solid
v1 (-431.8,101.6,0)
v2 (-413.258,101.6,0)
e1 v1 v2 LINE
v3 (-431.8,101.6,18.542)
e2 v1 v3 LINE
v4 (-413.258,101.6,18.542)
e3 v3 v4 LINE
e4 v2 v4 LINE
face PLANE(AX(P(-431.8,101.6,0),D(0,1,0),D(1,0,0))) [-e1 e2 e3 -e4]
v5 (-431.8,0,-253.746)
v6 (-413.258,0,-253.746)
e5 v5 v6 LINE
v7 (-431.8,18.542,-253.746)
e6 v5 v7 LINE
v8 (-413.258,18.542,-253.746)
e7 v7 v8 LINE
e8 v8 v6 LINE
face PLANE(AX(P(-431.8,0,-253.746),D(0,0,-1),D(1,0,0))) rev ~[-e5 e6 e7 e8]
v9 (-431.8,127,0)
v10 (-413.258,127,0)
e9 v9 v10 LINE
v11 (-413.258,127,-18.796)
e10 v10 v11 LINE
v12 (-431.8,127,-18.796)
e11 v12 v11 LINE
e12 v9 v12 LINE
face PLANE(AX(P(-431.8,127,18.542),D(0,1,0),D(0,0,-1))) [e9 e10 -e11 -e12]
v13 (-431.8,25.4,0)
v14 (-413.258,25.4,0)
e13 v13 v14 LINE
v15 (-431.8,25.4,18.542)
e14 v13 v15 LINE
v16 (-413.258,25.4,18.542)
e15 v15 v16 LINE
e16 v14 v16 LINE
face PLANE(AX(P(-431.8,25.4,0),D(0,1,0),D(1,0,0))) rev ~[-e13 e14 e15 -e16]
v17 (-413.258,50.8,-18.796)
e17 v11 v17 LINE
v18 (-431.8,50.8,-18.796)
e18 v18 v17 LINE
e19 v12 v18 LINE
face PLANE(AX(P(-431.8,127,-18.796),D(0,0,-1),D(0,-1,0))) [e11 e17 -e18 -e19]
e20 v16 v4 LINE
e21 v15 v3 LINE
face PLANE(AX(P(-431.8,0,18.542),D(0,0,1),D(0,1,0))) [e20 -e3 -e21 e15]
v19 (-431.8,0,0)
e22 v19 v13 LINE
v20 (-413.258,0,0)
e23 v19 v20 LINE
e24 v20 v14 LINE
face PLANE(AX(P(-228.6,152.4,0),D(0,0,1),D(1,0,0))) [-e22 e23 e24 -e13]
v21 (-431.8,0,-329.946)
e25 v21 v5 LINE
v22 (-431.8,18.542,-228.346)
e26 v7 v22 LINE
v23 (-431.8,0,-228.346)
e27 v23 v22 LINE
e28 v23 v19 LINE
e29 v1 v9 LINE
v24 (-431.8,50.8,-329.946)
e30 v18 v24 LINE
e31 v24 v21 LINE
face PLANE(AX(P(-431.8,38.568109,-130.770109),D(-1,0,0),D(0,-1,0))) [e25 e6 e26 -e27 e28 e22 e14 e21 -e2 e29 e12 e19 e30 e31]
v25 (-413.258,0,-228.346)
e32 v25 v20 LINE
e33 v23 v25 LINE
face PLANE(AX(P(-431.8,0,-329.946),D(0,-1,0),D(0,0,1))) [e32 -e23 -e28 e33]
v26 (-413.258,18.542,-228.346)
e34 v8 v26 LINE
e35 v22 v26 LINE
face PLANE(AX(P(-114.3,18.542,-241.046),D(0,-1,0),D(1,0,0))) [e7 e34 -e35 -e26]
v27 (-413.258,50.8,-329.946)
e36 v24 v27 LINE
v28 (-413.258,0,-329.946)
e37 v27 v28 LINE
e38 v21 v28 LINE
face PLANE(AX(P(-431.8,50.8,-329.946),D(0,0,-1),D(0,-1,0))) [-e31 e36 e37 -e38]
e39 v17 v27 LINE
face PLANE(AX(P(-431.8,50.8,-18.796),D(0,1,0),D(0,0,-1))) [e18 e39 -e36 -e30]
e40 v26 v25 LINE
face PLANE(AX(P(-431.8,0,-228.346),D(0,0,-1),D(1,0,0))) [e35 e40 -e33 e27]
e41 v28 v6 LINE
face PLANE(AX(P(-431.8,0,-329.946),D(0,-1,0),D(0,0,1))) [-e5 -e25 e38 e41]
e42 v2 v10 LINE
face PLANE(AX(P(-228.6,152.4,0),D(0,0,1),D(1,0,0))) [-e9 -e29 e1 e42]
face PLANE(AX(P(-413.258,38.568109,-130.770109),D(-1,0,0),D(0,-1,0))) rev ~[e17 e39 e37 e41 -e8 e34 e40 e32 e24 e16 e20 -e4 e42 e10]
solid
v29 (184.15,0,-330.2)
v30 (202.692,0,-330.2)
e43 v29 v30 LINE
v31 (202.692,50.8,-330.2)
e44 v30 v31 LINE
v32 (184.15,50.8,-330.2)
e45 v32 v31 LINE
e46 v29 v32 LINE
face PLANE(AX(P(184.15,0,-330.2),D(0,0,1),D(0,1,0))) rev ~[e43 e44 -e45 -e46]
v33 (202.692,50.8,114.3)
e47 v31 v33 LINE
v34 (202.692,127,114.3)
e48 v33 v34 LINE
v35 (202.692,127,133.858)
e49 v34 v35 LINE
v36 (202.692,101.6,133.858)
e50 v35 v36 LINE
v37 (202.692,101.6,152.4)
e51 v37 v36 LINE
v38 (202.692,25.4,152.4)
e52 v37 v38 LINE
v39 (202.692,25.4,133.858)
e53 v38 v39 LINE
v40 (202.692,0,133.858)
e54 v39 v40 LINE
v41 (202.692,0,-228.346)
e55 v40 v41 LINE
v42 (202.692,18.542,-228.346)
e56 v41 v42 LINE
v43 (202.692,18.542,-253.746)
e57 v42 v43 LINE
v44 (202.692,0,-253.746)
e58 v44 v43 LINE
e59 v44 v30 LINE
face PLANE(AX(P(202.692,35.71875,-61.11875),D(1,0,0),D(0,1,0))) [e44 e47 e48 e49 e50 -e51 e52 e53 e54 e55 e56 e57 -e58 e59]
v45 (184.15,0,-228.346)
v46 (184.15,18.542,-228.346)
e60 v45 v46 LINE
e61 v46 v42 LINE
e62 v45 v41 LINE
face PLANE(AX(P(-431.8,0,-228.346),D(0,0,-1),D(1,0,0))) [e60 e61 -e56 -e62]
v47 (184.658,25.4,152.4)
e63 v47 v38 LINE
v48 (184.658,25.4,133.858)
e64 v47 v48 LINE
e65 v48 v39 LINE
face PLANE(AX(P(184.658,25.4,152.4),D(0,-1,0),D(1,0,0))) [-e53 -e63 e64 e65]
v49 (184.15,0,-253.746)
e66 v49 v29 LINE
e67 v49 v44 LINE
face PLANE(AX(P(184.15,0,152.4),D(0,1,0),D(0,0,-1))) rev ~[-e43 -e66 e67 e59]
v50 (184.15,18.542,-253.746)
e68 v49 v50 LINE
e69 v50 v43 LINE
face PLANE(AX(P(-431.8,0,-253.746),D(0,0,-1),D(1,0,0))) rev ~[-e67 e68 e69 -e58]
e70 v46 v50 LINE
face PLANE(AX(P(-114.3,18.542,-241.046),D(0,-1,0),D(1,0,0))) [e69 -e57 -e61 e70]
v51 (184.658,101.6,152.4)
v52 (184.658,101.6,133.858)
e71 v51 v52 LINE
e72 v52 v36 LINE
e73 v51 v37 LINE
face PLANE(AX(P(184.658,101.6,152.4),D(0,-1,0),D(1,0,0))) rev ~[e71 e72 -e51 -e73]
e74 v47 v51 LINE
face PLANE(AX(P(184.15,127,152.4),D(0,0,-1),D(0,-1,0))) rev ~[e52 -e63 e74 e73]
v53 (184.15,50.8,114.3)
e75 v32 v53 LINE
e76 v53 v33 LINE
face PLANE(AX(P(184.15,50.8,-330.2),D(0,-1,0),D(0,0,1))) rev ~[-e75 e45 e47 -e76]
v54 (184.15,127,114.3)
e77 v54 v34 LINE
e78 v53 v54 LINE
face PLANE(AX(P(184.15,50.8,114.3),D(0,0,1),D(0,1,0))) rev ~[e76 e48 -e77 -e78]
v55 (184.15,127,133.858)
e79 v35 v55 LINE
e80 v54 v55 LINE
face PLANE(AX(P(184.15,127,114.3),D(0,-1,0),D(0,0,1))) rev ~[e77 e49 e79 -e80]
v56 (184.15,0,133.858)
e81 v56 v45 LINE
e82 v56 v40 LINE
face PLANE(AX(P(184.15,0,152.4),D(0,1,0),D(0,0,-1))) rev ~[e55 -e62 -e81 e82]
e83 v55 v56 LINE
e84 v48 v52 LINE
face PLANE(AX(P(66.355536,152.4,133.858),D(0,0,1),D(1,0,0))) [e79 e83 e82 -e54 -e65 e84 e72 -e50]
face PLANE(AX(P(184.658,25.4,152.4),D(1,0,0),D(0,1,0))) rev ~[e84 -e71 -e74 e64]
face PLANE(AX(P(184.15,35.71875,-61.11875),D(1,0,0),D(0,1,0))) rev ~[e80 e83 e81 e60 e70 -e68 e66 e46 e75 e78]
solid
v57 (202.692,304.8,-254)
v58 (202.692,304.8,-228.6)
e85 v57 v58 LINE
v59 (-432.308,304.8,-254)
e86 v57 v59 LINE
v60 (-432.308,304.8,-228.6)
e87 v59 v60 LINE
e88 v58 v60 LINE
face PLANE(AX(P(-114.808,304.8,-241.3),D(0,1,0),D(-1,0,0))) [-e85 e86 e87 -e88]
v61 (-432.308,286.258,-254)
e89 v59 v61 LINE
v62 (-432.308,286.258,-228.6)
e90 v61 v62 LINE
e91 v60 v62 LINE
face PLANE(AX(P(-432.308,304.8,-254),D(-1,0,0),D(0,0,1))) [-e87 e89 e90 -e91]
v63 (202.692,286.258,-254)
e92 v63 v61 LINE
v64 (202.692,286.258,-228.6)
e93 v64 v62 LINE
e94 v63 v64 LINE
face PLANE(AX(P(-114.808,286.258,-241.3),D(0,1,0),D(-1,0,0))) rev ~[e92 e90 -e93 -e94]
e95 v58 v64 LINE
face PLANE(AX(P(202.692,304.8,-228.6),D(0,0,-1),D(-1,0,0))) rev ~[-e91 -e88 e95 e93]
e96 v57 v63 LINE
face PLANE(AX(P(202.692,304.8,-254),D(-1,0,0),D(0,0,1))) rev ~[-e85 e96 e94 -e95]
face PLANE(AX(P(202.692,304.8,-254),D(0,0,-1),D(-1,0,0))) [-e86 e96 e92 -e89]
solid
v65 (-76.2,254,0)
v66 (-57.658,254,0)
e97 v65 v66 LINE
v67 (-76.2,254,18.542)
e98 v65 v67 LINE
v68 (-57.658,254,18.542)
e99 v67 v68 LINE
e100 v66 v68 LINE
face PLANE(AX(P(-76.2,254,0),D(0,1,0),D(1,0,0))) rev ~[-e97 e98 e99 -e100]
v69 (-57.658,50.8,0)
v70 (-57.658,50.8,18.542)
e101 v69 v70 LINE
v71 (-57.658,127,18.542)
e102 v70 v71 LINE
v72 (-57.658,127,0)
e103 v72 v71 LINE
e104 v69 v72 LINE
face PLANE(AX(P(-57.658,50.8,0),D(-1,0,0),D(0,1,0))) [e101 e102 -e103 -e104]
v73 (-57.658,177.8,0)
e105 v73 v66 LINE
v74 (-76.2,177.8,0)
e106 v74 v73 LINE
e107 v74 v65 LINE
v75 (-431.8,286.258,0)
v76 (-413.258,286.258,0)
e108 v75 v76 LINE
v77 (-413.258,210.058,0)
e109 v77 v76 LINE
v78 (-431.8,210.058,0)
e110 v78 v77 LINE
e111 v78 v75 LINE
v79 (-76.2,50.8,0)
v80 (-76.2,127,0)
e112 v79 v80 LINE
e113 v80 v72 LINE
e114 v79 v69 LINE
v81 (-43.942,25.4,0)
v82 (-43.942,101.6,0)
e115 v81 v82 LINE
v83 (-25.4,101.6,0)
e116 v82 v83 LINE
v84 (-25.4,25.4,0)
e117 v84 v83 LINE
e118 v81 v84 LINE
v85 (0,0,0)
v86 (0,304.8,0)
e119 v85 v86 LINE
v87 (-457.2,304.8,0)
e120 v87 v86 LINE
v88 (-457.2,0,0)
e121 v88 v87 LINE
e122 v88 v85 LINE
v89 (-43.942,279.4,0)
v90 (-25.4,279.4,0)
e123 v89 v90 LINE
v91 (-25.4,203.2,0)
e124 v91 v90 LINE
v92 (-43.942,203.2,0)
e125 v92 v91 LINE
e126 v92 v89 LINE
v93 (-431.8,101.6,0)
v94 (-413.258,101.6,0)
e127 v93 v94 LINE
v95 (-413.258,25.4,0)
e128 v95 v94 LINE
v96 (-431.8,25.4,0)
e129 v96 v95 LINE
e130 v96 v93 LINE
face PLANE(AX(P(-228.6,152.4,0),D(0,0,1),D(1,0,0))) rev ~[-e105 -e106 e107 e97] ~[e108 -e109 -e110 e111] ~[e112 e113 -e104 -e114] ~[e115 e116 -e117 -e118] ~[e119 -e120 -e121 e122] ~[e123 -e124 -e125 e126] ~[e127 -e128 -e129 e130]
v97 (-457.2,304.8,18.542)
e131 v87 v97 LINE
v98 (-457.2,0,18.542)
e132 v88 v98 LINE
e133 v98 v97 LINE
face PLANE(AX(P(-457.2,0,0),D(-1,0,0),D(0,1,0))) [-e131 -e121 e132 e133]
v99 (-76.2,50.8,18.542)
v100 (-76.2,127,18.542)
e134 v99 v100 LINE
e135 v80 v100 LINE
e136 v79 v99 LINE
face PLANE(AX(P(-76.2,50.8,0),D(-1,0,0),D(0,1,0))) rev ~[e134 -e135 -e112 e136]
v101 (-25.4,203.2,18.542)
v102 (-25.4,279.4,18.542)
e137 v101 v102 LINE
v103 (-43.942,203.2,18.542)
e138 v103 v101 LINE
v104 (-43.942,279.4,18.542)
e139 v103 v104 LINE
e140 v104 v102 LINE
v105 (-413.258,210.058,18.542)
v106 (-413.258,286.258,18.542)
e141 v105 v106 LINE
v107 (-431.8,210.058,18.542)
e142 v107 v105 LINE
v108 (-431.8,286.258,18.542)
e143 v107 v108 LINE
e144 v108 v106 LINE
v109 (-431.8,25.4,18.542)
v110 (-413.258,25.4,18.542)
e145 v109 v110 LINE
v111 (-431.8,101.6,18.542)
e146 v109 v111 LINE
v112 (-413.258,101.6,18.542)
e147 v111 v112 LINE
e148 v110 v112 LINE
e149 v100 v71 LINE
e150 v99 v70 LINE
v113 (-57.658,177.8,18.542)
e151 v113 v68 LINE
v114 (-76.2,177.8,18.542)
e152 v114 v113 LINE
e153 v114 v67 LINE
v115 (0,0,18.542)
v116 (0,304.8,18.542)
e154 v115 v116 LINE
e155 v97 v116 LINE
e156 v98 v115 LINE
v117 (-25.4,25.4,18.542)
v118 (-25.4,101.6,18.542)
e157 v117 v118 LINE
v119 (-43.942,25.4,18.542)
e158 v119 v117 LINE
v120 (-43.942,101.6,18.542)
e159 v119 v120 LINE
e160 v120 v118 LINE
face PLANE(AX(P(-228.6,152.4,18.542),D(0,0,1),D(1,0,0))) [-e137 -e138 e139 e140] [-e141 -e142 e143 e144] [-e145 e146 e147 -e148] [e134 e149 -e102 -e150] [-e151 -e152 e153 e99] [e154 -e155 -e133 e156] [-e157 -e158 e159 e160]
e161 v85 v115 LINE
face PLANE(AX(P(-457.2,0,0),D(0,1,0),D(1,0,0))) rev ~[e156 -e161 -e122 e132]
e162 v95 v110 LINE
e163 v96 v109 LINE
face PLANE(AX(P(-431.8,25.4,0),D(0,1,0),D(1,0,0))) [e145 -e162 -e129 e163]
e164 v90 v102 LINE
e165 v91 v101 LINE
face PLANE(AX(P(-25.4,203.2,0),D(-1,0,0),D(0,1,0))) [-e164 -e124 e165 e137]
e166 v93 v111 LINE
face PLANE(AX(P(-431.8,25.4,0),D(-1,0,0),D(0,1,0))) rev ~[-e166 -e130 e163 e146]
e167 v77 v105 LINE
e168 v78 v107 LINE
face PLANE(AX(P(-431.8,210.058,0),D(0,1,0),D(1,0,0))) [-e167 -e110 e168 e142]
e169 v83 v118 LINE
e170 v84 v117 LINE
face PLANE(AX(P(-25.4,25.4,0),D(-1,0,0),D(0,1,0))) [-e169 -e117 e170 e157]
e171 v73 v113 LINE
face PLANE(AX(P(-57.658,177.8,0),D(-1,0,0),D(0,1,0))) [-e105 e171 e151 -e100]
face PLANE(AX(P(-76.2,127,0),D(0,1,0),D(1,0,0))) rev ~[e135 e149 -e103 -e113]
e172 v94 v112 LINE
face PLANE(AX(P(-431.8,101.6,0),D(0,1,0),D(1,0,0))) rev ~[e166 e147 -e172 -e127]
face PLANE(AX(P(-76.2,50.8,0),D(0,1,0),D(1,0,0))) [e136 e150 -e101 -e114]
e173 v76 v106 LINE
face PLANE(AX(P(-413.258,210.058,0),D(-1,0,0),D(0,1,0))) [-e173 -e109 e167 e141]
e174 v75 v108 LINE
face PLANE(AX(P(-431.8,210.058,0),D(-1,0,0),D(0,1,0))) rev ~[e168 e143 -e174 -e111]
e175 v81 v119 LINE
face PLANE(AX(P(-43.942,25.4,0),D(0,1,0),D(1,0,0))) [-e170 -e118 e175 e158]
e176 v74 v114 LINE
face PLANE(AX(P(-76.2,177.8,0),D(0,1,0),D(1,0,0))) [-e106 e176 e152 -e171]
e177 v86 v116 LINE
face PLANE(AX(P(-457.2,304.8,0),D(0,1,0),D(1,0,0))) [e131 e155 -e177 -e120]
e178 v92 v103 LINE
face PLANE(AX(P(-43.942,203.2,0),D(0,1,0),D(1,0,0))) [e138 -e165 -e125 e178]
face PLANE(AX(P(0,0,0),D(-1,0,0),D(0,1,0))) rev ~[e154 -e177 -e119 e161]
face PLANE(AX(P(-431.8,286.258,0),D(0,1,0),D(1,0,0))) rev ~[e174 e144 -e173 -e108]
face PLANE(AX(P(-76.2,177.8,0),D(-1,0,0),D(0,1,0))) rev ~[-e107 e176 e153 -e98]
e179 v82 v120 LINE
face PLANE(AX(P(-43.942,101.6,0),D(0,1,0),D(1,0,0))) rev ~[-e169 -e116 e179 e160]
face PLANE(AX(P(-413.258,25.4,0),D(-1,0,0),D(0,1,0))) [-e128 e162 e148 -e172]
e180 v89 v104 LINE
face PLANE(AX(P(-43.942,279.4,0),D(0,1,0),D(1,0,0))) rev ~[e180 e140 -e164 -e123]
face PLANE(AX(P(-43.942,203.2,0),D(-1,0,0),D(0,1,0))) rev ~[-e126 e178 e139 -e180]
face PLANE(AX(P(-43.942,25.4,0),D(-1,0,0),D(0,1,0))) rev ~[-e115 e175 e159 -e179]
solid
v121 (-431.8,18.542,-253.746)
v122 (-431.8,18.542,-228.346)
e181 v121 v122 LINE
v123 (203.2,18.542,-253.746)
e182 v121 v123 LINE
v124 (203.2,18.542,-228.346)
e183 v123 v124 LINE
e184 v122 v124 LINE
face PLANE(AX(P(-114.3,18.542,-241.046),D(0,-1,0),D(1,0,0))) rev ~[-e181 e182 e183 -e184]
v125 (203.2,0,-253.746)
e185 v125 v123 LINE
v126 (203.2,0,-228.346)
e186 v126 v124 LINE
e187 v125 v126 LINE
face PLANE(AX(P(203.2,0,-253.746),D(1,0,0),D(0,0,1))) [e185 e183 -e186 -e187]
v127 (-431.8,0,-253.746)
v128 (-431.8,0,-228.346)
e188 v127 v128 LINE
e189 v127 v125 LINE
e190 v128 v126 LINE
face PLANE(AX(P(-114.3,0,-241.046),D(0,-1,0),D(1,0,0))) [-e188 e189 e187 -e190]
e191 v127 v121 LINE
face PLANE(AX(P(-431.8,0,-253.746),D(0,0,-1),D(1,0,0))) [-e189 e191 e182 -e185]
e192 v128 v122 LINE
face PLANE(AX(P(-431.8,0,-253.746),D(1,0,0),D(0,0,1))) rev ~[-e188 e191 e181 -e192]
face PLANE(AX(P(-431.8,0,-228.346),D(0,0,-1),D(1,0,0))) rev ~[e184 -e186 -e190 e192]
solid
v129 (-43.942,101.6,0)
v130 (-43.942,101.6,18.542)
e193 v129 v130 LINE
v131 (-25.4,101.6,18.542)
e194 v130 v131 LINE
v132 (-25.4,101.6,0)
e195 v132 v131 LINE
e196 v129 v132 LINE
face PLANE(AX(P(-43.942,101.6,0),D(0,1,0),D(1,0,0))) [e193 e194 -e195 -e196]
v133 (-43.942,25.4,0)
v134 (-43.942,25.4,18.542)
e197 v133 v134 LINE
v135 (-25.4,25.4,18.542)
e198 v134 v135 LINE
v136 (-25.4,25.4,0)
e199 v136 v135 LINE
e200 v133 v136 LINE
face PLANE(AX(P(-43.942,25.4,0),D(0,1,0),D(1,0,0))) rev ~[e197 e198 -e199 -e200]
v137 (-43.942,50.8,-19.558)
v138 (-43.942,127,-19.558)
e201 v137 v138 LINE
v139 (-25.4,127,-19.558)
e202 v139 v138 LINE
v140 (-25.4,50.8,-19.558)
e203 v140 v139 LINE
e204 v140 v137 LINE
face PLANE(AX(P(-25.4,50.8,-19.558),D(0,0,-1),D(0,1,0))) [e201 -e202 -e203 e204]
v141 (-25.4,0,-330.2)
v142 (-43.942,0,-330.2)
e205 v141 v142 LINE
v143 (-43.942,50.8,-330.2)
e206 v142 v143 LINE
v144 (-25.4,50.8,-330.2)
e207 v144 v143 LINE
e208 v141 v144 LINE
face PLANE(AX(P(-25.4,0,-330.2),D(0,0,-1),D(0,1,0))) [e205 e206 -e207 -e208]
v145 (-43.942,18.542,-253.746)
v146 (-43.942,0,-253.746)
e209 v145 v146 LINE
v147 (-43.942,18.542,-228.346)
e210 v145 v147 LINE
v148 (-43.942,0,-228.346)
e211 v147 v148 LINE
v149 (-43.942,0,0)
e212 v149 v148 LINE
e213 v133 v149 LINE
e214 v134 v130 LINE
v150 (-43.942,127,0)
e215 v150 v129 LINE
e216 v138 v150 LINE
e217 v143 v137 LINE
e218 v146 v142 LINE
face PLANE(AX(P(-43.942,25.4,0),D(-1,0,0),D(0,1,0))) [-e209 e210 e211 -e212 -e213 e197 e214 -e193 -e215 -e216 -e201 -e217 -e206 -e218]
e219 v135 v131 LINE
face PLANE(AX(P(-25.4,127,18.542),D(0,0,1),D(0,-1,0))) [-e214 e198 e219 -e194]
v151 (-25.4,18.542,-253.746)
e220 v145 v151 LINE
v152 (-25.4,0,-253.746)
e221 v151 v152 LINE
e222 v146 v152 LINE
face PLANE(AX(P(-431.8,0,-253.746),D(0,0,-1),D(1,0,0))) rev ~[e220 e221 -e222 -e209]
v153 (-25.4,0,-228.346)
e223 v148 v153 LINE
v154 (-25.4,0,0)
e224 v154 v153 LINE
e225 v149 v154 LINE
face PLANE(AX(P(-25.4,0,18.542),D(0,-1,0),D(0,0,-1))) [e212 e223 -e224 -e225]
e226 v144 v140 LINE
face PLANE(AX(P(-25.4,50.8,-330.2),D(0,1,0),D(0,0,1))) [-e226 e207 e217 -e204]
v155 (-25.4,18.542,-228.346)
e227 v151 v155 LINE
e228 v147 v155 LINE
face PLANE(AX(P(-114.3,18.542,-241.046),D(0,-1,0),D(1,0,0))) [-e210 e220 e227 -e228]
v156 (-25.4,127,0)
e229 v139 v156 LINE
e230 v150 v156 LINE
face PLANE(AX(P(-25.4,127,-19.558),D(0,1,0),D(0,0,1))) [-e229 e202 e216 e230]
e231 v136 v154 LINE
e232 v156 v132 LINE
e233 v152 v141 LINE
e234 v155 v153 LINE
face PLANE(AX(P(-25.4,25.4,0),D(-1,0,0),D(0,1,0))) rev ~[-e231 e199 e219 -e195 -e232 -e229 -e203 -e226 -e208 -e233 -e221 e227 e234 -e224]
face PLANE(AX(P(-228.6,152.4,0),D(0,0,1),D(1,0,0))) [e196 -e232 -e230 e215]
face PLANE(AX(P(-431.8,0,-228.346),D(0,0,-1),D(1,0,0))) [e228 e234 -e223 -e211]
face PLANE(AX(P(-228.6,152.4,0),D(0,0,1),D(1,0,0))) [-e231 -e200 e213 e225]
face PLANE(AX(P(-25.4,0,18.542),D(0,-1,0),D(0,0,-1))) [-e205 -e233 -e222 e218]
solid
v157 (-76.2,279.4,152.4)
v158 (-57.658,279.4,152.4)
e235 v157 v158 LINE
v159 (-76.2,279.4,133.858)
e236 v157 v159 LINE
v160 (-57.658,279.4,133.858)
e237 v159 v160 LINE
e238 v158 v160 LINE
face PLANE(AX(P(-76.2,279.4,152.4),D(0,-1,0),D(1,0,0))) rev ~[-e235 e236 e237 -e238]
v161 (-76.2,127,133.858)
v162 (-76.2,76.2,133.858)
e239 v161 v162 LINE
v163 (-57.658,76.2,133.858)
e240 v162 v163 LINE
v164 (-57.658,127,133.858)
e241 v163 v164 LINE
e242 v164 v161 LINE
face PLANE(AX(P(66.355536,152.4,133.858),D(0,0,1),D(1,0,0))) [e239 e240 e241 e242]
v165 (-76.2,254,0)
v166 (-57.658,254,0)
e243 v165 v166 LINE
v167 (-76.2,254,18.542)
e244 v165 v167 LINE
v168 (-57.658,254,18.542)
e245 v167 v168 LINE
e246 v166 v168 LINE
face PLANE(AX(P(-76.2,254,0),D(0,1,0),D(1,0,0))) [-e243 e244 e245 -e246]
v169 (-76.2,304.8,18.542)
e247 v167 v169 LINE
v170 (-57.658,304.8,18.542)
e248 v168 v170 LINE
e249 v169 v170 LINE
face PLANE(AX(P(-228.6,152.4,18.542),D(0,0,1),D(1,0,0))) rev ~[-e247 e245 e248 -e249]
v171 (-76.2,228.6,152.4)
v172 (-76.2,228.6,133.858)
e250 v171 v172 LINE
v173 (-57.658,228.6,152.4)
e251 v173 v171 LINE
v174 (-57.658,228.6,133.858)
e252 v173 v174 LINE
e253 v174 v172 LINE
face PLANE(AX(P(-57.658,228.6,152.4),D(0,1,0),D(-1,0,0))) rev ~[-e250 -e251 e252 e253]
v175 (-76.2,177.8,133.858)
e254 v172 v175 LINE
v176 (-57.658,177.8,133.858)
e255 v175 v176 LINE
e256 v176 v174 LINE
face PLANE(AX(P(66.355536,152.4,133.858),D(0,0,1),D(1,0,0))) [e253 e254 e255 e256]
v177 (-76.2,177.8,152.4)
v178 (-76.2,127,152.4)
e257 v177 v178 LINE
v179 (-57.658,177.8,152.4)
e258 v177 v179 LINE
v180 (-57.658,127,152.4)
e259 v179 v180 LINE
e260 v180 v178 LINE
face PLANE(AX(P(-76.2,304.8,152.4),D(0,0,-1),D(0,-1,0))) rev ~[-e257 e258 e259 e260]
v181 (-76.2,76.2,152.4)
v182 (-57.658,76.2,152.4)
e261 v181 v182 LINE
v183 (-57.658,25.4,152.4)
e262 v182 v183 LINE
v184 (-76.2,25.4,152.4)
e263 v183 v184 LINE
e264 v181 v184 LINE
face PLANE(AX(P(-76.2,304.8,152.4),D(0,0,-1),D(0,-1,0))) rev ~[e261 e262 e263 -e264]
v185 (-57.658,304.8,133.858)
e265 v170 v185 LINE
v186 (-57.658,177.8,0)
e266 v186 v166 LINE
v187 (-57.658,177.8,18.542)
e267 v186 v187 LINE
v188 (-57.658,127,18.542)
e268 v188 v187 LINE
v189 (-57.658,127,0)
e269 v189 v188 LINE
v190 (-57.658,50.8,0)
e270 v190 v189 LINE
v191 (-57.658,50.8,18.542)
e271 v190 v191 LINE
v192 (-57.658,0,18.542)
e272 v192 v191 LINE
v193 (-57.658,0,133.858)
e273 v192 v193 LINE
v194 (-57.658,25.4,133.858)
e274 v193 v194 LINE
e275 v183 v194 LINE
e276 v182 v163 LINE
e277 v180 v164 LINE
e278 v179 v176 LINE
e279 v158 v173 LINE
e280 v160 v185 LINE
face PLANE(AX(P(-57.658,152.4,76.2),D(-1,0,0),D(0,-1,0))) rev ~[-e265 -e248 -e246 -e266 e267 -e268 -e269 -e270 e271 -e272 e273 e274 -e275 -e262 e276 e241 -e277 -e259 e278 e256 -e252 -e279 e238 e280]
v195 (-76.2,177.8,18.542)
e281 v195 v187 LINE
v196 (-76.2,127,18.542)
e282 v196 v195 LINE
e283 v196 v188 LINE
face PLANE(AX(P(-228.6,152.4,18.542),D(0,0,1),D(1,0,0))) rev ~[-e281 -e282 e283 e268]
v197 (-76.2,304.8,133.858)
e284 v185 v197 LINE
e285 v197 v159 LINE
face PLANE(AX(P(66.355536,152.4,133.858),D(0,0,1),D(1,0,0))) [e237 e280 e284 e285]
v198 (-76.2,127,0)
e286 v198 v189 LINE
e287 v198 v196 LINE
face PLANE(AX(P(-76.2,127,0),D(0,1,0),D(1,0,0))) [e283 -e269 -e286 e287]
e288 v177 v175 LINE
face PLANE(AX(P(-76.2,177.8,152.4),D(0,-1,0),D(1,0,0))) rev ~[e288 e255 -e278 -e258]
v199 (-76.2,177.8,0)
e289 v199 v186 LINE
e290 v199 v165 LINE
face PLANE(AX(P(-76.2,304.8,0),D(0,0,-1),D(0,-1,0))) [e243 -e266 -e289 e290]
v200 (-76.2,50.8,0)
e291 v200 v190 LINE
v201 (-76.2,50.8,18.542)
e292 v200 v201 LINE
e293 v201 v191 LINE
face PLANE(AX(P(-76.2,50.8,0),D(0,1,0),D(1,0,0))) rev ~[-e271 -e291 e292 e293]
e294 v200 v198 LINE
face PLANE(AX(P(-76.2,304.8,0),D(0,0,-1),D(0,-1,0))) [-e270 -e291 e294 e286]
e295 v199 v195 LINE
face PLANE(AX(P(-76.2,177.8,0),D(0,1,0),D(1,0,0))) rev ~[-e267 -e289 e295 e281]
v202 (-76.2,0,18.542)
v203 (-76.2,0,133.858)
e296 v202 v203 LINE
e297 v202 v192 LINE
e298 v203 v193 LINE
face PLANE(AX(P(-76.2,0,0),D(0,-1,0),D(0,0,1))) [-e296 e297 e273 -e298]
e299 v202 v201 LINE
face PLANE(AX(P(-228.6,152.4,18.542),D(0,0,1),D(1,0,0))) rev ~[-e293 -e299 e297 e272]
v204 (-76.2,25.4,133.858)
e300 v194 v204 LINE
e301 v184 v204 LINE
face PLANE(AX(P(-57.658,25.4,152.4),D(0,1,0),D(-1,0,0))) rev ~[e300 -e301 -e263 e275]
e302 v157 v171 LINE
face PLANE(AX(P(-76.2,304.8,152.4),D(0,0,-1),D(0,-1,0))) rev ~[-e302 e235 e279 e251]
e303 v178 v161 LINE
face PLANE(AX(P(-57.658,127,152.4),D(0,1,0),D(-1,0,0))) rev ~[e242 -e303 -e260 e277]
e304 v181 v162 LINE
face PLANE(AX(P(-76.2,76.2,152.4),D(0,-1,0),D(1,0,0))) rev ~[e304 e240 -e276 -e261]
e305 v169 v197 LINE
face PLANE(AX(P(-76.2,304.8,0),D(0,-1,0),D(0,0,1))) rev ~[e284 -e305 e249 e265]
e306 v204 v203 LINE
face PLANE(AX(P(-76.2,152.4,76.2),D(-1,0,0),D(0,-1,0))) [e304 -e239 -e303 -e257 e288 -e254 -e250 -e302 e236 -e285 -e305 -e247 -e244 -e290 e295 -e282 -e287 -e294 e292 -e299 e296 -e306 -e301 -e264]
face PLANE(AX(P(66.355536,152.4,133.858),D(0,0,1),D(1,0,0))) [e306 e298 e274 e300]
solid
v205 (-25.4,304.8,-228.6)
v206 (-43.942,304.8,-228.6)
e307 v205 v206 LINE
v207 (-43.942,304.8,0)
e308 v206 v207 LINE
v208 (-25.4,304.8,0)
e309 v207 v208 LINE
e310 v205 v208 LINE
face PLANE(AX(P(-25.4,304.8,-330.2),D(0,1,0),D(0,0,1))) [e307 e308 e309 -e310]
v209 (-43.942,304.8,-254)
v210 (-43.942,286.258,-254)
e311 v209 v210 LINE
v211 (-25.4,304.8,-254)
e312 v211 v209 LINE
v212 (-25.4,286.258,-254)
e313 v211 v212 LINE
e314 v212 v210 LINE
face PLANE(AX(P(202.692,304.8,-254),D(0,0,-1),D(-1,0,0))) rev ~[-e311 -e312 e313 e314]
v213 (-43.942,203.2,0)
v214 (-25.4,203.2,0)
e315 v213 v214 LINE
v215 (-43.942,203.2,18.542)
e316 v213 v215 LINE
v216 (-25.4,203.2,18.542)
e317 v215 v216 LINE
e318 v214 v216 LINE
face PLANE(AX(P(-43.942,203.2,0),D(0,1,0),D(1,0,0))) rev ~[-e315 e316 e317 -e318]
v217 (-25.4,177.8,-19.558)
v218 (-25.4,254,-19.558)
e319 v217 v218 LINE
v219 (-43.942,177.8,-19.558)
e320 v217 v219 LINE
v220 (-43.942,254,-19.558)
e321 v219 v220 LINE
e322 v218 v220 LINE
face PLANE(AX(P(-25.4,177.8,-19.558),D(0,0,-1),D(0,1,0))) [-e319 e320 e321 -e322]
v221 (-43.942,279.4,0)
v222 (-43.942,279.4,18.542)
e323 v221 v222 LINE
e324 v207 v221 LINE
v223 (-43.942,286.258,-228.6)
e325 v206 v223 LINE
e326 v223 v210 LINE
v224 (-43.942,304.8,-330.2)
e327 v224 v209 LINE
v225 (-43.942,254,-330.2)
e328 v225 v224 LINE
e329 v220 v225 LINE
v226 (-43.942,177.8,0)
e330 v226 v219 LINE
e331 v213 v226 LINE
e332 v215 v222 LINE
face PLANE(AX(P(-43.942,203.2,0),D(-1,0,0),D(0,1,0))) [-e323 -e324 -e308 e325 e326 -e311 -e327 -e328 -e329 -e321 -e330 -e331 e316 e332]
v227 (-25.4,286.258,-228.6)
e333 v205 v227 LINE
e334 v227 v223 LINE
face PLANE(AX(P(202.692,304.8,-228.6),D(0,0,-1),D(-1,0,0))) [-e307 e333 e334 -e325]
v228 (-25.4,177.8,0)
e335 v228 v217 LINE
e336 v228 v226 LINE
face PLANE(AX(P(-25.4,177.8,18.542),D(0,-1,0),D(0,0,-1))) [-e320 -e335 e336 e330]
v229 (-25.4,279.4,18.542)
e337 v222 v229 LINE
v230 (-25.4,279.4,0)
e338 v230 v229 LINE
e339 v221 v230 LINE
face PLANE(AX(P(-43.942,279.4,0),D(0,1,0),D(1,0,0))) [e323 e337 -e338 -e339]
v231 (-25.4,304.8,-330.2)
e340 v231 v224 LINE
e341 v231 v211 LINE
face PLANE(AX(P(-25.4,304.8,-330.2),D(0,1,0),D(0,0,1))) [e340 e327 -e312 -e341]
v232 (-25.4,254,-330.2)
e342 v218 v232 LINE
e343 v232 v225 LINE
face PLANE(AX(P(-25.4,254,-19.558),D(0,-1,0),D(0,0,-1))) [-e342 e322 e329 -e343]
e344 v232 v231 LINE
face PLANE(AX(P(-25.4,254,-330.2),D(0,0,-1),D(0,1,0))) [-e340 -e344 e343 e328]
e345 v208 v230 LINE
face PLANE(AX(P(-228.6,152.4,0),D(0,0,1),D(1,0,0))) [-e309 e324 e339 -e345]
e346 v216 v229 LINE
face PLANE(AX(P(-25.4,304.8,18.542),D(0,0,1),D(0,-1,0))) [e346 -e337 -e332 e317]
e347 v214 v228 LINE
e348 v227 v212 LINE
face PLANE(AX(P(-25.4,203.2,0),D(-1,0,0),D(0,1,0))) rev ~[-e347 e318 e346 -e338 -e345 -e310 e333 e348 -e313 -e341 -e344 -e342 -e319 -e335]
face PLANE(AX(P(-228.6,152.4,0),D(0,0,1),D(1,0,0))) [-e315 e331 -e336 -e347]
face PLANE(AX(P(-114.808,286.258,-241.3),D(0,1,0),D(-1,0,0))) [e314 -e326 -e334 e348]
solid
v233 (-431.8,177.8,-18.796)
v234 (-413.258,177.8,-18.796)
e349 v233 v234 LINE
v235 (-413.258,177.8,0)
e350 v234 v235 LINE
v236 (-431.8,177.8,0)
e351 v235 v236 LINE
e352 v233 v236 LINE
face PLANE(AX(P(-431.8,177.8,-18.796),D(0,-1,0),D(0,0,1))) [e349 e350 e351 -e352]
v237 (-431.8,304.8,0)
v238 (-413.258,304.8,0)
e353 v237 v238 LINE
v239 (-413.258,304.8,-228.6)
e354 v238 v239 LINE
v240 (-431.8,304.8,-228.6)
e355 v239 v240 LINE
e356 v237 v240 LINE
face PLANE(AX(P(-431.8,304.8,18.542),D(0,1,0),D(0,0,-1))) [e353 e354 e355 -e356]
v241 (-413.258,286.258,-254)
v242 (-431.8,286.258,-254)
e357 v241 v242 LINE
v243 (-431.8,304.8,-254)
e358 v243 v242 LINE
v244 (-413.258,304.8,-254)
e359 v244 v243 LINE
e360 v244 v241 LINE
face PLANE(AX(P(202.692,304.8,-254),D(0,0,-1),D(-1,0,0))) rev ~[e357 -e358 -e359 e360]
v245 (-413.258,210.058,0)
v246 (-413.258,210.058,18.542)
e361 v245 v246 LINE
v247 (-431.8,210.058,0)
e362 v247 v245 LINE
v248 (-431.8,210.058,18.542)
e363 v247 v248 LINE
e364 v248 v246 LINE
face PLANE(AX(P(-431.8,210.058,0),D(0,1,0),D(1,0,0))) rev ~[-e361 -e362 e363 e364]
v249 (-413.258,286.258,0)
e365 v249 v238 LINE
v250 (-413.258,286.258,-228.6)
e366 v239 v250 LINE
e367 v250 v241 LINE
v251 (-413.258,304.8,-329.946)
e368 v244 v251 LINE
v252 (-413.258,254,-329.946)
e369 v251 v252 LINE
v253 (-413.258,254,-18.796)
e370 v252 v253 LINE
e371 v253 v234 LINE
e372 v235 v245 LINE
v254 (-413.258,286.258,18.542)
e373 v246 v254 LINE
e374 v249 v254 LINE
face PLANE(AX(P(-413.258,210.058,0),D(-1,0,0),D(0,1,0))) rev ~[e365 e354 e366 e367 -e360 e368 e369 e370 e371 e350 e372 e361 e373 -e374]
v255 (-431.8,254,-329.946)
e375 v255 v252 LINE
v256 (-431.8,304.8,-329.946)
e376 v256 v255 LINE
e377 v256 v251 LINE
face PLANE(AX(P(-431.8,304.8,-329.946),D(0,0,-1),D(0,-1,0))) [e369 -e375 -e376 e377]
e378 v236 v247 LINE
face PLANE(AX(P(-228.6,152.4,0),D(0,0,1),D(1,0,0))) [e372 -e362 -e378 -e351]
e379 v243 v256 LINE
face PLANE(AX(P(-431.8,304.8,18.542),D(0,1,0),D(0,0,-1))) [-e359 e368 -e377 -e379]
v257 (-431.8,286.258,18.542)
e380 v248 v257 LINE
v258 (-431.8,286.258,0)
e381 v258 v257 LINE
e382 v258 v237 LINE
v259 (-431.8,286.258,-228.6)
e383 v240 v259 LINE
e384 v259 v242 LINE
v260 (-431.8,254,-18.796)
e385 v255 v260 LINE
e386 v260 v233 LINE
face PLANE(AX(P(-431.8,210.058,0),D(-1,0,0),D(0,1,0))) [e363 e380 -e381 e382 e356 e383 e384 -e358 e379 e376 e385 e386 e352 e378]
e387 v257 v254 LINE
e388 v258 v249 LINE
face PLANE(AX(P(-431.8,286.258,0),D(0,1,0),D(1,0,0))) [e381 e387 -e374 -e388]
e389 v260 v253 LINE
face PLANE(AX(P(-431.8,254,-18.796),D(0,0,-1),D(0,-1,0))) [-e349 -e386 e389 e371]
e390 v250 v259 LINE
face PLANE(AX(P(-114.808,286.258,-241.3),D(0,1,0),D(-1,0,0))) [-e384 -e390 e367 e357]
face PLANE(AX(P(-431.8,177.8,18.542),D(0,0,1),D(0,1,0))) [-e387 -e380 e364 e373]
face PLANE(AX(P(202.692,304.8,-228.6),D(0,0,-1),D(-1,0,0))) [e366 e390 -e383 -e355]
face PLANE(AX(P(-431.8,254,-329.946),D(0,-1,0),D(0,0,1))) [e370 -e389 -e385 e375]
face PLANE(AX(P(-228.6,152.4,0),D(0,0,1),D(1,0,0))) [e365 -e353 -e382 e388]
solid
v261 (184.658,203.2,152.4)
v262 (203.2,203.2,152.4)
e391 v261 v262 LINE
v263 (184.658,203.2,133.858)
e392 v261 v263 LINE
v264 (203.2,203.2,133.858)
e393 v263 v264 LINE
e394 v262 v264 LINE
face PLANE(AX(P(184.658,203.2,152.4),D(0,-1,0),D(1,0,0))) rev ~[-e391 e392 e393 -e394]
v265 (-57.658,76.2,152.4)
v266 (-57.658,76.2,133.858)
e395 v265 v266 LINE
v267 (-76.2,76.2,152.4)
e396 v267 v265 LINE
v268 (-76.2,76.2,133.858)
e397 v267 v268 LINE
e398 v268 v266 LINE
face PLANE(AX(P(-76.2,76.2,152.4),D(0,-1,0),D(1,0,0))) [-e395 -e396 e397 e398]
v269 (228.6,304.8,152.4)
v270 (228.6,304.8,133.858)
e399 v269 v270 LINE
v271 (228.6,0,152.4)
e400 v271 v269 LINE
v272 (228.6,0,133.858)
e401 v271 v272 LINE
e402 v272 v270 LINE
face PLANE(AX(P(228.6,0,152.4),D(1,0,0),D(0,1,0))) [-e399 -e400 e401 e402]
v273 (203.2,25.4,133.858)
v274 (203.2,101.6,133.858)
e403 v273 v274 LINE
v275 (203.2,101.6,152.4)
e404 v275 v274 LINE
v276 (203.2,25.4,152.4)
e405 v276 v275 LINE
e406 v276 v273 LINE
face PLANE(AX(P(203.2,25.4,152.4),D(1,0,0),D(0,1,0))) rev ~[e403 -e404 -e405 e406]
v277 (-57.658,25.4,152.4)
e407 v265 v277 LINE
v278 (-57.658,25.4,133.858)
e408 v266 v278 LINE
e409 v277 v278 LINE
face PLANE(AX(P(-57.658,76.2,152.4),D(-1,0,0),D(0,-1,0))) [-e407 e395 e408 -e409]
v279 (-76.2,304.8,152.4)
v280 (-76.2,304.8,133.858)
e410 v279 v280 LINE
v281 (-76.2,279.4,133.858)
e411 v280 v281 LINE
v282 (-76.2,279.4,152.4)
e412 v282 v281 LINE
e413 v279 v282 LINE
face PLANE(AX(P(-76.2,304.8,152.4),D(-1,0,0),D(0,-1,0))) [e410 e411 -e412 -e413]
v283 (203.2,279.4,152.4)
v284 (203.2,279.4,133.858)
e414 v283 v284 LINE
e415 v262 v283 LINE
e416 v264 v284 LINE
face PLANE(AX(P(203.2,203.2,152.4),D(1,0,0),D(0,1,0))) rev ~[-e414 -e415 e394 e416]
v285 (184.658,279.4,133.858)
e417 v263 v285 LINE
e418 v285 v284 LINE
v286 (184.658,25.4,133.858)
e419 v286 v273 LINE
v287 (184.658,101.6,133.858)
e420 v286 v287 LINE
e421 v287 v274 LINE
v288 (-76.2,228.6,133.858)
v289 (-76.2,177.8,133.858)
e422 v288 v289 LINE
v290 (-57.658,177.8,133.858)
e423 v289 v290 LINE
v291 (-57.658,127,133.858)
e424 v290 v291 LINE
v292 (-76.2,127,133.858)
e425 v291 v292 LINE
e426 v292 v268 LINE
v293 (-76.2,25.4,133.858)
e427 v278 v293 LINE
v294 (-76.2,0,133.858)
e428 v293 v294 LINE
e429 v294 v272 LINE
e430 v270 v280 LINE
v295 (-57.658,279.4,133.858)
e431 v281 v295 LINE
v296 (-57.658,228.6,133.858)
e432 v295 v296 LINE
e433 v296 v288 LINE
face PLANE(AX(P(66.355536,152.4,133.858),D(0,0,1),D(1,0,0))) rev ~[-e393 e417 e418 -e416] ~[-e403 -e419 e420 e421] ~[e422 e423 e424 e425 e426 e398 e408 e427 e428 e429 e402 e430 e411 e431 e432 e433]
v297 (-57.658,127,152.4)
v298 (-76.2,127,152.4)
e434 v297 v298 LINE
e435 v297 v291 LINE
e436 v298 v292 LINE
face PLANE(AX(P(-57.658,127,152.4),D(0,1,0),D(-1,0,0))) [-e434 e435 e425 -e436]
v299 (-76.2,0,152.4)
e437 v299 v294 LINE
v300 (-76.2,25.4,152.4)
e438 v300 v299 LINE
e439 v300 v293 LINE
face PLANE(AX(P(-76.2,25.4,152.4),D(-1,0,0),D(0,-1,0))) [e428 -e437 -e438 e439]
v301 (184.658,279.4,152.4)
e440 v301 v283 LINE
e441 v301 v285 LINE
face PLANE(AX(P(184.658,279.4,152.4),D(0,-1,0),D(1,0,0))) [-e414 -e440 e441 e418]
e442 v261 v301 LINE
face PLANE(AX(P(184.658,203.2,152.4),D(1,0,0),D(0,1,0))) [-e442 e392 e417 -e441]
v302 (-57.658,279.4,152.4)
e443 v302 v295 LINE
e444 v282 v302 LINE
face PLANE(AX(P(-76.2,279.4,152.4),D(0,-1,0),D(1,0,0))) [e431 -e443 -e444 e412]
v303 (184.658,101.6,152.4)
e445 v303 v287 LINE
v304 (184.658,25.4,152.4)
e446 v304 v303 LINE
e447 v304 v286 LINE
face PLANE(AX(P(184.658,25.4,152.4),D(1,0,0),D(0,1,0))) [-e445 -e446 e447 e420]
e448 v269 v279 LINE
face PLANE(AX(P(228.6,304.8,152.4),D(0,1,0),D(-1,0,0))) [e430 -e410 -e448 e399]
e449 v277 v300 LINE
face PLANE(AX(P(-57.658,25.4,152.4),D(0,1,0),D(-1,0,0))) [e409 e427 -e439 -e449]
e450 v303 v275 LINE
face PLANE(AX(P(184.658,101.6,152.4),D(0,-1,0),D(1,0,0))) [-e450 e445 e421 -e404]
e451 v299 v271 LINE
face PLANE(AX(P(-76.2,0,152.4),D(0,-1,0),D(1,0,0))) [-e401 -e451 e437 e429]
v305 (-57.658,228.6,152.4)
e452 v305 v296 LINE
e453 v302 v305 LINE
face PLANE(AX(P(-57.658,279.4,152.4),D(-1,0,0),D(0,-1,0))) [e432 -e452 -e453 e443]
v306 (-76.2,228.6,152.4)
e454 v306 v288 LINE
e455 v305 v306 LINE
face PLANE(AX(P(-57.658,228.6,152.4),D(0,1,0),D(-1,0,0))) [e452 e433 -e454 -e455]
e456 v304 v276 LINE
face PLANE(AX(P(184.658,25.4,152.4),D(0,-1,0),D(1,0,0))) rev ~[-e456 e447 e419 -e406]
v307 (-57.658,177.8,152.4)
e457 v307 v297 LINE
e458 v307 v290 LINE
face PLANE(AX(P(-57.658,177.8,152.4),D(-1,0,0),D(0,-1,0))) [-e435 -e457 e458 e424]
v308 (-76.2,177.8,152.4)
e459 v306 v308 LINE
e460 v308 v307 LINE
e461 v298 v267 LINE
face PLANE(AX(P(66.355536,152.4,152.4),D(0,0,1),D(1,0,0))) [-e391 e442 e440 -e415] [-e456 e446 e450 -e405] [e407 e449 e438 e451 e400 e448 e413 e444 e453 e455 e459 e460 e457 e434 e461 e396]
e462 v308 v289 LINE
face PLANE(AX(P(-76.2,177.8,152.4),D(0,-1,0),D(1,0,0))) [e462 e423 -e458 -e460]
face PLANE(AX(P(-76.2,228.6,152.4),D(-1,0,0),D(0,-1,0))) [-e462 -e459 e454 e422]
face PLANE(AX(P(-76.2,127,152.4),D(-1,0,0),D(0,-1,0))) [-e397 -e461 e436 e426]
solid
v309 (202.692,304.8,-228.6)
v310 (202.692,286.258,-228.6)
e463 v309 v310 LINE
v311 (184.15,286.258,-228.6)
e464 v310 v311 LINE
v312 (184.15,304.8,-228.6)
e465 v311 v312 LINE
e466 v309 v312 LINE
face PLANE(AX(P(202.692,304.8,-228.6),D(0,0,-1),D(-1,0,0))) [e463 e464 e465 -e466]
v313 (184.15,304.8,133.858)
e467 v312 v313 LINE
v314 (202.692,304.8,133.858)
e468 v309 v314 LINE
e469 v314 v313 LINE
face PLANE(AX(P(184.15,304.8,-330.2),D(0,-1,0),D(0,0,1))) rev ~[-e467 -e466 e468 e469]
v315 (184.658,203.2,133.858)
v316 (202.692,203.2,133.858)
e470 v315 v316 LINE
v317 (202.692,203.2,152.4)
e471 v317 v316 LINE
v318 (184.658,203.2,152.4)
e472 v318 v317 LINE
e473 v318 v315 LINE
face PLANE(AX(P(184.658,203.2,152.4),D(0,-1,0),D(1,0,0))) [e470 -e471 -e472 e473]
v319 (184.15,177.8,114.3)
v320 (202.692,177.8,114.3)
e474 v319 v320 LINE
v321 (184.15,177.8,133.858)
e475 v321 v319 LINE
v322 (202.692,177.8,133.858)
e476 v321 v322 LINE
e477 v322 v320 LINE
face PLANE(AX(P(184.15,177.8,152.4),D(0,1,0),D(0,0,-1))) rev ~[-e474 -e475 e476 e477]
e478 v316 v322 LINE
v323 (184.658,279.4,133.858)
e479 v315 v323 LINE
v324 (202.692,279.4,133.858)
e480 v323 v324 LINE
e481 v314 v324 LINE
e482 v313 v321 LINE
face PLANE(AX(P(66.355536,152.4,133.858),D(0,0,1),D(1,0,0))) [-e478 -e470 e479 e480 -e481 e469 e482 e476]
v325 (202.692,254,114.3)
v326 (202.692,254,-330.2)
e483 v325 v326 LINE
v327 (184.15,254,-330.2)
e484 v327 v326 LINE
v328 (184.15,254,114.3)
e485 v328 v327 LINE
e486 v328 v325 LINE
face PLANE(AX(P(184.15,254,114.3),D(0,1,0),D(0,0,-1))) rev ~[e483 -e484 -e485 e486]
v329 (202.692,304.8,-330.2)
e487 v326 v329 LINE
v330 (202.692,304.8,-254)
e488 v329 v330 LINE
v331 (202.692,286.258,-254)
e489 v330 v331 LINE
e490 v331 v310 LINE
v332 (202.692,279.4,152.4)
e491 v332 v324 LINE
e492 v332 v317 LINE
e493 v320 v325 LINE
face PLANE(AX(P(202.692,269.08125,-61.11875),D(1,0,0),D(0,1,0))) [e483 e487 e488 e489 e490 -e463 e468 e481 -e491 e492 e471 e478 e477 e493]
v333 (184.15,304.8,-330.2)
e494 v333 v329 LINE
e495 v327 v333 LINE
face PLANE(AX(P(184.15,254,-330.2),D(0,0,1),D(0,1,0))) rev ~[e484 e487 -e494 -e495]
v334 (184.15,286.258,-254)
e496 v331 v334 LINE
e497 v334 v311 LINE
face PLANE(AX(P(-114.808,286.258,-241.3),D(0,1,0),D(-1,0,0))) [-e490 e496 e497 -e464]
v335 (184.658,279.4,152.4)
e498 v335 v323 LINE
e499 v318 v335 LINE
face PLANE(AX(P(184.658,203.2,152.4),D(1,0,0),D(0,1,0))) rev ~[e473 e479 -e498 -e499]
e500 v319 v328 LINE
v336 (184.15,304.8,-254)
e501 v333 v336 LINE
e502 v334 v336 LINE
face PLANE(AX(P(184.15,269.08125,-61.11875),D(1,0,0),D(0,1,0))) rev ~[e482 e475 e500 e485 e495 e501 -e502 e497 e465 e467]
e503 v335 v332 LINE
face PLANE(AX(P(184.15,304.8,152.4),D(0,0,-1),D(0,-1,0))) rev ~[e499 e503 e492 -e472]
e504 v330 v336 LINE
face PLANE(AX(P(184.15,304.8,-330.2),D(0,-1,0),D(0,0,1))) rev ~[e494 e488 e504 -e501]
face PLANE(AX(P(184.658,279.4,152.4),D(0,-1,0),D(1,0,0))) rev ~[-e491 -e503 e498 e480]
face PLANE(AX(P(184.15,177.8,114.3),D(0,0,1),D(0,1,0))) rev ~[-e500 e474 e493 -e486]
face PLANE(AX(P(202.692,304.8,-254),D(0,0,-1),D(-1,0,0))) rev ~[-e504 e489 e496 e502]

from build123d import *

# Parameters (mm, degrees)
F1_W      = 457.2
F1_H      = 304.8
F1_W_2    = 18.542
F1_H_2    = 76.2
F2_DEPTH  = 18.542
F4_W      = 18.542
F4_H      = 76.2
F5_DEPTH  = 18.542
F6_W      = 304.8
F6_H      = 152.4
F7_DEPTH  = 18.542
F11_DEPTH = 18.542
F18_DEPTH = 18.542
F24_DEPTH = 18.542
F27_W     = 635
F27_H     = 25.4
F28_DEPTH = 18.542
F29_W     = 635
F29_H     = 25.4
F30_DEPTH = 18.542


# Not quite as in the source:
# - a variable given as a bare number and used for a length is read in inches; the dataset says mm whatever the document's units were
# - a feature names something its author has since deleted; it is built from what else it names


with BuildPart() as f2:
    # F1 (on Top) → F2 (new body)
    with BuildSketch(Plane.XY):
        with Locations((-228.6, 152.4)):
            Rectangle(F1_W, F1_H)
        with Locations((-422.529, 63.5)):
            Rectangle(F1_W_2, F1_H_2, mode=Mode.SUBTRACT)
        with Locations((-34.671, 63.5)):
            Rectangle(F1_W_2, F1_H_2, mode=Mode.SUBTRACT)
        with Locations((-66.929, 88.9)):
            Rectangle(F1_W_2, F1_H_2, mode=Mode.SUBTRACT)
        with Locations((-422.529, 248.158)):
            Rectangle(F1_W_2, F1_H_2, mode=Mode.SUBTRACT)
        with Locations((-66.929, 215.9)):
            Rectangle(F1_W_2, F1_H_2, mode=Mode.SUBTRACT)
        with Locations((-34.671, 241.3)):
            Rectangle(F1_W_2, F1_H_2, mode=Mode.SUBTRACT)
    extrude(amount=F2_DEPTH)


with BuildPart() as f5:
    # F4 (on offset) → F5 (new body)
    with BuildSketch(Plane.XY.offset(152.4)):
        Polygon((-76.2, 25.4), (-76.2, 0), (228.6, 0), (228.6, 304.8), (-76.2, 304.8), (-76.2, 279.4), (-57.658, 279.4), (-57.658, 228.6), (-76.2, 228.6), (-76.2, 177.8), (-57.658, 177.8), (-57.658, 127), (-76.2, 127), (-76.2, 76.2), (-57.658, 76.2), (-57.658, 25.4), align=None)
        with Locations((193.929, 63.5)):
            Rectangle(F4_W, F4_H, mode=Mode.SUBTRACT)
        with Locations((193.929, 241.3)):
            Rectangle(F4_W, F4_H, mode=Mode.SUBTRACT)
    extrude(amount=-F5_DEPTH)


with BuildPart() as f7:
    # F6 (on face) → F7 (new body)
    with BuildSketch(Plane(origin=(-76.2, 0, 0), x_dir=(0, -1, 0), z_dir=(-1, 0, 0))):
        with Locations((-152.4, 76.2)):
            Rectangle(F6_W, F6_H)
    extrude(amount=-F7_DEPTH)

    # F8: cut F5
    add(f5.part, mode=Mode.SUBTRACT)

    # F16: cut F2
    add(f2.part, mode=Mode.SUBTRACT)


with BuildPart() as f11:
    # F10 (on Right) → F11 (new body)
    with BuildSketch(Plane.YZ):
        Polygon((127, 152.4), (0, 152.4), (0, -330.2), (50.8, -330.2), (50.8, 114.3), (127, 114.3), align=None)
    extrude(amount=F11_DEPTH)


with BuildPart() as f11b:
    # F10 (on Right) → F11, piece 2 (new body)
    with BuildSketch(Plane.YZ):
        Polygon((254, 114.3), (254, -330.2), (304.8, -330.2), (304.8, 152.4), (177.8, 152.4), (177.8, 114.3), align=None)
    extrude(amount=F11_DEPTH)


with BuildPart() as f11_1:
    # F12: moved
    add(f11.part.moved(Location((184.15, 0, 0))))

    # F13: cut F5
    add(f5.part, mode=Mode.SUBTRACT)


with BuildPart() as f11b_1:
    # F14: moved
    add(f11b.part.moved(Location((184.15, 0, 0))))

    # F15: cut F5
    add(f5.part, mode=Mode.SUBTRACT)


with BuildPart() as f18:
    # F17 (on Right) → F18 (new body)
    with BuildSketch(Plane.YZ):
        Polygon((127, 18.542), (0, 18.542), (0, -330.2), (50.8, -330.2), (50.8, -19.558), (127, -19.558), align=None)
    extrude(amount=-F18_DEPTH)


with BuildPart() as f18b:
    # F17 (on Right) → F18, piece 2 (new body)
    with BuildSketch(Plane.YZ):
        Polygon((304.8, 18.542), (177.8, 18.542), (177.8, -19.558), (254, -19.558), (254, -330.2), (304.8, -330.2), align=None)
    extrude(amount=-F18_DEPTH)


with BuildPart() as f18_1:
    # F19: moved
    add(f18.part.moved(Location((-25.4, 0, 0))))

    # F20: cut F2
    add(f2.part, mode=Mode.SUBTRACT)


with BuildPart() as f18b_1:
    # F21: moved
    add(f18b.part.moved(Location((-25.4, 0, 0))))

    # F22: cut F2
    add(f2.part, mode=Mode.SUBTRACT)


with BuildPart() as f24:
    # F23 (on face) → F24 (new body)
    with BuildSketch(Plane(origin=(-457.2, 0, 0), x_dir=(0, -1, 0), z_dir=(-1, 0, 0))):
        Polygon((-177.8, 18.542), (-304.8, 18.542), (-304.8, -329.946), (-254, -329.946), (-254, -18.796), (-177.8, -18.796), align=None)
    extrude(amount=-F24_DEPTH)


with BuildPart() as f24b:
    # F23 (on face) → F24, piece 2 (new body)
    with BuildSketch(Plane(origin=(-457.2, 0, 0), x_dir=(0, -1, 0), z_dir=(-1, 0, 0))):
        Polygon((-50.8, -18.796), (-50.8, -329.946), (0, -329.946), (0, 18.542), (-127, 18.542), (-127, -18.796), align=None)
    extrude(amount=-F24_DEPTH)


with BuildPart() as f24_1:
    # F25: moved
    add(f24.part.moved(Location((25.4, 0, 0))))

    # F26: cut F2
    add(f2.part, mode=Mode.SUBTRACT)


with BuildPart() as f24b_1:
    # F25: moved
    add(f24b.part.moved(Location((25.4, 0, 0))))

    # F26: cut F2
    add(f2.part, mode=Mode.SUBTRACT)


with BuildPart() as f28:
    # F27 (on face) → F28 (new body)
    with BuildSketch(Plane.XZ):
        with Locations((-114.3, -241.046)):
            Rectangle(F27_W, F27_H)
    extrude(amount=-F28_DEPTH)


with BuildPart() as f30:
    # F29 (on face) → F30 (new body)
    with BuildSketch(Plane(origin=(0, 304.8, 0), x_dir=(-1, 0, 0), z_dir=(0, 1, 0))):
        with Locations((114.808, -241.3)):
            Rectangle(F29_W, F29_H)
    extrude(amount=-F30_DEPTH)


with BuildPart() as f24b_2:
    add(f24b_1.part)

    # F31: cut F28
    add(f28.part, mode=Mode.SUBTRACT)


with BuildPart() as f18_2:
    add(f18_1.part)

    # F31: cut F28
    add(f28.part, mode=Mode.SUBTRACT)


with BuildPart() as f11_2:
    add(f11_1.part)

    # F31: cut F28
    add(f28.part, mode=Mode.SUBTRACT)


with BuildPart() as f11b_2:
    add(f11b_1.part)

    # F32: cut F30
    add(f30.part, mode=Mode.SUBTRACT)


with BuildPart() as f18b_2:
    add(f18b_1.part)

    # F32: cut F30
    add(f30.part, mode=Mode.SUBTRACT)


with BuildPart() as f24_2:
    add(f24_1.part)

    # F32: cut F30
    add(f30.part, mode=Mode.SUBTRACT)


solid = Compound([f2.part, f5.part, f7.part, f28.part, f30.part, f24b_2.part, f18_2.part, f11_2.part, f11b_2.part, f18b_2.part, f24_2.part])
